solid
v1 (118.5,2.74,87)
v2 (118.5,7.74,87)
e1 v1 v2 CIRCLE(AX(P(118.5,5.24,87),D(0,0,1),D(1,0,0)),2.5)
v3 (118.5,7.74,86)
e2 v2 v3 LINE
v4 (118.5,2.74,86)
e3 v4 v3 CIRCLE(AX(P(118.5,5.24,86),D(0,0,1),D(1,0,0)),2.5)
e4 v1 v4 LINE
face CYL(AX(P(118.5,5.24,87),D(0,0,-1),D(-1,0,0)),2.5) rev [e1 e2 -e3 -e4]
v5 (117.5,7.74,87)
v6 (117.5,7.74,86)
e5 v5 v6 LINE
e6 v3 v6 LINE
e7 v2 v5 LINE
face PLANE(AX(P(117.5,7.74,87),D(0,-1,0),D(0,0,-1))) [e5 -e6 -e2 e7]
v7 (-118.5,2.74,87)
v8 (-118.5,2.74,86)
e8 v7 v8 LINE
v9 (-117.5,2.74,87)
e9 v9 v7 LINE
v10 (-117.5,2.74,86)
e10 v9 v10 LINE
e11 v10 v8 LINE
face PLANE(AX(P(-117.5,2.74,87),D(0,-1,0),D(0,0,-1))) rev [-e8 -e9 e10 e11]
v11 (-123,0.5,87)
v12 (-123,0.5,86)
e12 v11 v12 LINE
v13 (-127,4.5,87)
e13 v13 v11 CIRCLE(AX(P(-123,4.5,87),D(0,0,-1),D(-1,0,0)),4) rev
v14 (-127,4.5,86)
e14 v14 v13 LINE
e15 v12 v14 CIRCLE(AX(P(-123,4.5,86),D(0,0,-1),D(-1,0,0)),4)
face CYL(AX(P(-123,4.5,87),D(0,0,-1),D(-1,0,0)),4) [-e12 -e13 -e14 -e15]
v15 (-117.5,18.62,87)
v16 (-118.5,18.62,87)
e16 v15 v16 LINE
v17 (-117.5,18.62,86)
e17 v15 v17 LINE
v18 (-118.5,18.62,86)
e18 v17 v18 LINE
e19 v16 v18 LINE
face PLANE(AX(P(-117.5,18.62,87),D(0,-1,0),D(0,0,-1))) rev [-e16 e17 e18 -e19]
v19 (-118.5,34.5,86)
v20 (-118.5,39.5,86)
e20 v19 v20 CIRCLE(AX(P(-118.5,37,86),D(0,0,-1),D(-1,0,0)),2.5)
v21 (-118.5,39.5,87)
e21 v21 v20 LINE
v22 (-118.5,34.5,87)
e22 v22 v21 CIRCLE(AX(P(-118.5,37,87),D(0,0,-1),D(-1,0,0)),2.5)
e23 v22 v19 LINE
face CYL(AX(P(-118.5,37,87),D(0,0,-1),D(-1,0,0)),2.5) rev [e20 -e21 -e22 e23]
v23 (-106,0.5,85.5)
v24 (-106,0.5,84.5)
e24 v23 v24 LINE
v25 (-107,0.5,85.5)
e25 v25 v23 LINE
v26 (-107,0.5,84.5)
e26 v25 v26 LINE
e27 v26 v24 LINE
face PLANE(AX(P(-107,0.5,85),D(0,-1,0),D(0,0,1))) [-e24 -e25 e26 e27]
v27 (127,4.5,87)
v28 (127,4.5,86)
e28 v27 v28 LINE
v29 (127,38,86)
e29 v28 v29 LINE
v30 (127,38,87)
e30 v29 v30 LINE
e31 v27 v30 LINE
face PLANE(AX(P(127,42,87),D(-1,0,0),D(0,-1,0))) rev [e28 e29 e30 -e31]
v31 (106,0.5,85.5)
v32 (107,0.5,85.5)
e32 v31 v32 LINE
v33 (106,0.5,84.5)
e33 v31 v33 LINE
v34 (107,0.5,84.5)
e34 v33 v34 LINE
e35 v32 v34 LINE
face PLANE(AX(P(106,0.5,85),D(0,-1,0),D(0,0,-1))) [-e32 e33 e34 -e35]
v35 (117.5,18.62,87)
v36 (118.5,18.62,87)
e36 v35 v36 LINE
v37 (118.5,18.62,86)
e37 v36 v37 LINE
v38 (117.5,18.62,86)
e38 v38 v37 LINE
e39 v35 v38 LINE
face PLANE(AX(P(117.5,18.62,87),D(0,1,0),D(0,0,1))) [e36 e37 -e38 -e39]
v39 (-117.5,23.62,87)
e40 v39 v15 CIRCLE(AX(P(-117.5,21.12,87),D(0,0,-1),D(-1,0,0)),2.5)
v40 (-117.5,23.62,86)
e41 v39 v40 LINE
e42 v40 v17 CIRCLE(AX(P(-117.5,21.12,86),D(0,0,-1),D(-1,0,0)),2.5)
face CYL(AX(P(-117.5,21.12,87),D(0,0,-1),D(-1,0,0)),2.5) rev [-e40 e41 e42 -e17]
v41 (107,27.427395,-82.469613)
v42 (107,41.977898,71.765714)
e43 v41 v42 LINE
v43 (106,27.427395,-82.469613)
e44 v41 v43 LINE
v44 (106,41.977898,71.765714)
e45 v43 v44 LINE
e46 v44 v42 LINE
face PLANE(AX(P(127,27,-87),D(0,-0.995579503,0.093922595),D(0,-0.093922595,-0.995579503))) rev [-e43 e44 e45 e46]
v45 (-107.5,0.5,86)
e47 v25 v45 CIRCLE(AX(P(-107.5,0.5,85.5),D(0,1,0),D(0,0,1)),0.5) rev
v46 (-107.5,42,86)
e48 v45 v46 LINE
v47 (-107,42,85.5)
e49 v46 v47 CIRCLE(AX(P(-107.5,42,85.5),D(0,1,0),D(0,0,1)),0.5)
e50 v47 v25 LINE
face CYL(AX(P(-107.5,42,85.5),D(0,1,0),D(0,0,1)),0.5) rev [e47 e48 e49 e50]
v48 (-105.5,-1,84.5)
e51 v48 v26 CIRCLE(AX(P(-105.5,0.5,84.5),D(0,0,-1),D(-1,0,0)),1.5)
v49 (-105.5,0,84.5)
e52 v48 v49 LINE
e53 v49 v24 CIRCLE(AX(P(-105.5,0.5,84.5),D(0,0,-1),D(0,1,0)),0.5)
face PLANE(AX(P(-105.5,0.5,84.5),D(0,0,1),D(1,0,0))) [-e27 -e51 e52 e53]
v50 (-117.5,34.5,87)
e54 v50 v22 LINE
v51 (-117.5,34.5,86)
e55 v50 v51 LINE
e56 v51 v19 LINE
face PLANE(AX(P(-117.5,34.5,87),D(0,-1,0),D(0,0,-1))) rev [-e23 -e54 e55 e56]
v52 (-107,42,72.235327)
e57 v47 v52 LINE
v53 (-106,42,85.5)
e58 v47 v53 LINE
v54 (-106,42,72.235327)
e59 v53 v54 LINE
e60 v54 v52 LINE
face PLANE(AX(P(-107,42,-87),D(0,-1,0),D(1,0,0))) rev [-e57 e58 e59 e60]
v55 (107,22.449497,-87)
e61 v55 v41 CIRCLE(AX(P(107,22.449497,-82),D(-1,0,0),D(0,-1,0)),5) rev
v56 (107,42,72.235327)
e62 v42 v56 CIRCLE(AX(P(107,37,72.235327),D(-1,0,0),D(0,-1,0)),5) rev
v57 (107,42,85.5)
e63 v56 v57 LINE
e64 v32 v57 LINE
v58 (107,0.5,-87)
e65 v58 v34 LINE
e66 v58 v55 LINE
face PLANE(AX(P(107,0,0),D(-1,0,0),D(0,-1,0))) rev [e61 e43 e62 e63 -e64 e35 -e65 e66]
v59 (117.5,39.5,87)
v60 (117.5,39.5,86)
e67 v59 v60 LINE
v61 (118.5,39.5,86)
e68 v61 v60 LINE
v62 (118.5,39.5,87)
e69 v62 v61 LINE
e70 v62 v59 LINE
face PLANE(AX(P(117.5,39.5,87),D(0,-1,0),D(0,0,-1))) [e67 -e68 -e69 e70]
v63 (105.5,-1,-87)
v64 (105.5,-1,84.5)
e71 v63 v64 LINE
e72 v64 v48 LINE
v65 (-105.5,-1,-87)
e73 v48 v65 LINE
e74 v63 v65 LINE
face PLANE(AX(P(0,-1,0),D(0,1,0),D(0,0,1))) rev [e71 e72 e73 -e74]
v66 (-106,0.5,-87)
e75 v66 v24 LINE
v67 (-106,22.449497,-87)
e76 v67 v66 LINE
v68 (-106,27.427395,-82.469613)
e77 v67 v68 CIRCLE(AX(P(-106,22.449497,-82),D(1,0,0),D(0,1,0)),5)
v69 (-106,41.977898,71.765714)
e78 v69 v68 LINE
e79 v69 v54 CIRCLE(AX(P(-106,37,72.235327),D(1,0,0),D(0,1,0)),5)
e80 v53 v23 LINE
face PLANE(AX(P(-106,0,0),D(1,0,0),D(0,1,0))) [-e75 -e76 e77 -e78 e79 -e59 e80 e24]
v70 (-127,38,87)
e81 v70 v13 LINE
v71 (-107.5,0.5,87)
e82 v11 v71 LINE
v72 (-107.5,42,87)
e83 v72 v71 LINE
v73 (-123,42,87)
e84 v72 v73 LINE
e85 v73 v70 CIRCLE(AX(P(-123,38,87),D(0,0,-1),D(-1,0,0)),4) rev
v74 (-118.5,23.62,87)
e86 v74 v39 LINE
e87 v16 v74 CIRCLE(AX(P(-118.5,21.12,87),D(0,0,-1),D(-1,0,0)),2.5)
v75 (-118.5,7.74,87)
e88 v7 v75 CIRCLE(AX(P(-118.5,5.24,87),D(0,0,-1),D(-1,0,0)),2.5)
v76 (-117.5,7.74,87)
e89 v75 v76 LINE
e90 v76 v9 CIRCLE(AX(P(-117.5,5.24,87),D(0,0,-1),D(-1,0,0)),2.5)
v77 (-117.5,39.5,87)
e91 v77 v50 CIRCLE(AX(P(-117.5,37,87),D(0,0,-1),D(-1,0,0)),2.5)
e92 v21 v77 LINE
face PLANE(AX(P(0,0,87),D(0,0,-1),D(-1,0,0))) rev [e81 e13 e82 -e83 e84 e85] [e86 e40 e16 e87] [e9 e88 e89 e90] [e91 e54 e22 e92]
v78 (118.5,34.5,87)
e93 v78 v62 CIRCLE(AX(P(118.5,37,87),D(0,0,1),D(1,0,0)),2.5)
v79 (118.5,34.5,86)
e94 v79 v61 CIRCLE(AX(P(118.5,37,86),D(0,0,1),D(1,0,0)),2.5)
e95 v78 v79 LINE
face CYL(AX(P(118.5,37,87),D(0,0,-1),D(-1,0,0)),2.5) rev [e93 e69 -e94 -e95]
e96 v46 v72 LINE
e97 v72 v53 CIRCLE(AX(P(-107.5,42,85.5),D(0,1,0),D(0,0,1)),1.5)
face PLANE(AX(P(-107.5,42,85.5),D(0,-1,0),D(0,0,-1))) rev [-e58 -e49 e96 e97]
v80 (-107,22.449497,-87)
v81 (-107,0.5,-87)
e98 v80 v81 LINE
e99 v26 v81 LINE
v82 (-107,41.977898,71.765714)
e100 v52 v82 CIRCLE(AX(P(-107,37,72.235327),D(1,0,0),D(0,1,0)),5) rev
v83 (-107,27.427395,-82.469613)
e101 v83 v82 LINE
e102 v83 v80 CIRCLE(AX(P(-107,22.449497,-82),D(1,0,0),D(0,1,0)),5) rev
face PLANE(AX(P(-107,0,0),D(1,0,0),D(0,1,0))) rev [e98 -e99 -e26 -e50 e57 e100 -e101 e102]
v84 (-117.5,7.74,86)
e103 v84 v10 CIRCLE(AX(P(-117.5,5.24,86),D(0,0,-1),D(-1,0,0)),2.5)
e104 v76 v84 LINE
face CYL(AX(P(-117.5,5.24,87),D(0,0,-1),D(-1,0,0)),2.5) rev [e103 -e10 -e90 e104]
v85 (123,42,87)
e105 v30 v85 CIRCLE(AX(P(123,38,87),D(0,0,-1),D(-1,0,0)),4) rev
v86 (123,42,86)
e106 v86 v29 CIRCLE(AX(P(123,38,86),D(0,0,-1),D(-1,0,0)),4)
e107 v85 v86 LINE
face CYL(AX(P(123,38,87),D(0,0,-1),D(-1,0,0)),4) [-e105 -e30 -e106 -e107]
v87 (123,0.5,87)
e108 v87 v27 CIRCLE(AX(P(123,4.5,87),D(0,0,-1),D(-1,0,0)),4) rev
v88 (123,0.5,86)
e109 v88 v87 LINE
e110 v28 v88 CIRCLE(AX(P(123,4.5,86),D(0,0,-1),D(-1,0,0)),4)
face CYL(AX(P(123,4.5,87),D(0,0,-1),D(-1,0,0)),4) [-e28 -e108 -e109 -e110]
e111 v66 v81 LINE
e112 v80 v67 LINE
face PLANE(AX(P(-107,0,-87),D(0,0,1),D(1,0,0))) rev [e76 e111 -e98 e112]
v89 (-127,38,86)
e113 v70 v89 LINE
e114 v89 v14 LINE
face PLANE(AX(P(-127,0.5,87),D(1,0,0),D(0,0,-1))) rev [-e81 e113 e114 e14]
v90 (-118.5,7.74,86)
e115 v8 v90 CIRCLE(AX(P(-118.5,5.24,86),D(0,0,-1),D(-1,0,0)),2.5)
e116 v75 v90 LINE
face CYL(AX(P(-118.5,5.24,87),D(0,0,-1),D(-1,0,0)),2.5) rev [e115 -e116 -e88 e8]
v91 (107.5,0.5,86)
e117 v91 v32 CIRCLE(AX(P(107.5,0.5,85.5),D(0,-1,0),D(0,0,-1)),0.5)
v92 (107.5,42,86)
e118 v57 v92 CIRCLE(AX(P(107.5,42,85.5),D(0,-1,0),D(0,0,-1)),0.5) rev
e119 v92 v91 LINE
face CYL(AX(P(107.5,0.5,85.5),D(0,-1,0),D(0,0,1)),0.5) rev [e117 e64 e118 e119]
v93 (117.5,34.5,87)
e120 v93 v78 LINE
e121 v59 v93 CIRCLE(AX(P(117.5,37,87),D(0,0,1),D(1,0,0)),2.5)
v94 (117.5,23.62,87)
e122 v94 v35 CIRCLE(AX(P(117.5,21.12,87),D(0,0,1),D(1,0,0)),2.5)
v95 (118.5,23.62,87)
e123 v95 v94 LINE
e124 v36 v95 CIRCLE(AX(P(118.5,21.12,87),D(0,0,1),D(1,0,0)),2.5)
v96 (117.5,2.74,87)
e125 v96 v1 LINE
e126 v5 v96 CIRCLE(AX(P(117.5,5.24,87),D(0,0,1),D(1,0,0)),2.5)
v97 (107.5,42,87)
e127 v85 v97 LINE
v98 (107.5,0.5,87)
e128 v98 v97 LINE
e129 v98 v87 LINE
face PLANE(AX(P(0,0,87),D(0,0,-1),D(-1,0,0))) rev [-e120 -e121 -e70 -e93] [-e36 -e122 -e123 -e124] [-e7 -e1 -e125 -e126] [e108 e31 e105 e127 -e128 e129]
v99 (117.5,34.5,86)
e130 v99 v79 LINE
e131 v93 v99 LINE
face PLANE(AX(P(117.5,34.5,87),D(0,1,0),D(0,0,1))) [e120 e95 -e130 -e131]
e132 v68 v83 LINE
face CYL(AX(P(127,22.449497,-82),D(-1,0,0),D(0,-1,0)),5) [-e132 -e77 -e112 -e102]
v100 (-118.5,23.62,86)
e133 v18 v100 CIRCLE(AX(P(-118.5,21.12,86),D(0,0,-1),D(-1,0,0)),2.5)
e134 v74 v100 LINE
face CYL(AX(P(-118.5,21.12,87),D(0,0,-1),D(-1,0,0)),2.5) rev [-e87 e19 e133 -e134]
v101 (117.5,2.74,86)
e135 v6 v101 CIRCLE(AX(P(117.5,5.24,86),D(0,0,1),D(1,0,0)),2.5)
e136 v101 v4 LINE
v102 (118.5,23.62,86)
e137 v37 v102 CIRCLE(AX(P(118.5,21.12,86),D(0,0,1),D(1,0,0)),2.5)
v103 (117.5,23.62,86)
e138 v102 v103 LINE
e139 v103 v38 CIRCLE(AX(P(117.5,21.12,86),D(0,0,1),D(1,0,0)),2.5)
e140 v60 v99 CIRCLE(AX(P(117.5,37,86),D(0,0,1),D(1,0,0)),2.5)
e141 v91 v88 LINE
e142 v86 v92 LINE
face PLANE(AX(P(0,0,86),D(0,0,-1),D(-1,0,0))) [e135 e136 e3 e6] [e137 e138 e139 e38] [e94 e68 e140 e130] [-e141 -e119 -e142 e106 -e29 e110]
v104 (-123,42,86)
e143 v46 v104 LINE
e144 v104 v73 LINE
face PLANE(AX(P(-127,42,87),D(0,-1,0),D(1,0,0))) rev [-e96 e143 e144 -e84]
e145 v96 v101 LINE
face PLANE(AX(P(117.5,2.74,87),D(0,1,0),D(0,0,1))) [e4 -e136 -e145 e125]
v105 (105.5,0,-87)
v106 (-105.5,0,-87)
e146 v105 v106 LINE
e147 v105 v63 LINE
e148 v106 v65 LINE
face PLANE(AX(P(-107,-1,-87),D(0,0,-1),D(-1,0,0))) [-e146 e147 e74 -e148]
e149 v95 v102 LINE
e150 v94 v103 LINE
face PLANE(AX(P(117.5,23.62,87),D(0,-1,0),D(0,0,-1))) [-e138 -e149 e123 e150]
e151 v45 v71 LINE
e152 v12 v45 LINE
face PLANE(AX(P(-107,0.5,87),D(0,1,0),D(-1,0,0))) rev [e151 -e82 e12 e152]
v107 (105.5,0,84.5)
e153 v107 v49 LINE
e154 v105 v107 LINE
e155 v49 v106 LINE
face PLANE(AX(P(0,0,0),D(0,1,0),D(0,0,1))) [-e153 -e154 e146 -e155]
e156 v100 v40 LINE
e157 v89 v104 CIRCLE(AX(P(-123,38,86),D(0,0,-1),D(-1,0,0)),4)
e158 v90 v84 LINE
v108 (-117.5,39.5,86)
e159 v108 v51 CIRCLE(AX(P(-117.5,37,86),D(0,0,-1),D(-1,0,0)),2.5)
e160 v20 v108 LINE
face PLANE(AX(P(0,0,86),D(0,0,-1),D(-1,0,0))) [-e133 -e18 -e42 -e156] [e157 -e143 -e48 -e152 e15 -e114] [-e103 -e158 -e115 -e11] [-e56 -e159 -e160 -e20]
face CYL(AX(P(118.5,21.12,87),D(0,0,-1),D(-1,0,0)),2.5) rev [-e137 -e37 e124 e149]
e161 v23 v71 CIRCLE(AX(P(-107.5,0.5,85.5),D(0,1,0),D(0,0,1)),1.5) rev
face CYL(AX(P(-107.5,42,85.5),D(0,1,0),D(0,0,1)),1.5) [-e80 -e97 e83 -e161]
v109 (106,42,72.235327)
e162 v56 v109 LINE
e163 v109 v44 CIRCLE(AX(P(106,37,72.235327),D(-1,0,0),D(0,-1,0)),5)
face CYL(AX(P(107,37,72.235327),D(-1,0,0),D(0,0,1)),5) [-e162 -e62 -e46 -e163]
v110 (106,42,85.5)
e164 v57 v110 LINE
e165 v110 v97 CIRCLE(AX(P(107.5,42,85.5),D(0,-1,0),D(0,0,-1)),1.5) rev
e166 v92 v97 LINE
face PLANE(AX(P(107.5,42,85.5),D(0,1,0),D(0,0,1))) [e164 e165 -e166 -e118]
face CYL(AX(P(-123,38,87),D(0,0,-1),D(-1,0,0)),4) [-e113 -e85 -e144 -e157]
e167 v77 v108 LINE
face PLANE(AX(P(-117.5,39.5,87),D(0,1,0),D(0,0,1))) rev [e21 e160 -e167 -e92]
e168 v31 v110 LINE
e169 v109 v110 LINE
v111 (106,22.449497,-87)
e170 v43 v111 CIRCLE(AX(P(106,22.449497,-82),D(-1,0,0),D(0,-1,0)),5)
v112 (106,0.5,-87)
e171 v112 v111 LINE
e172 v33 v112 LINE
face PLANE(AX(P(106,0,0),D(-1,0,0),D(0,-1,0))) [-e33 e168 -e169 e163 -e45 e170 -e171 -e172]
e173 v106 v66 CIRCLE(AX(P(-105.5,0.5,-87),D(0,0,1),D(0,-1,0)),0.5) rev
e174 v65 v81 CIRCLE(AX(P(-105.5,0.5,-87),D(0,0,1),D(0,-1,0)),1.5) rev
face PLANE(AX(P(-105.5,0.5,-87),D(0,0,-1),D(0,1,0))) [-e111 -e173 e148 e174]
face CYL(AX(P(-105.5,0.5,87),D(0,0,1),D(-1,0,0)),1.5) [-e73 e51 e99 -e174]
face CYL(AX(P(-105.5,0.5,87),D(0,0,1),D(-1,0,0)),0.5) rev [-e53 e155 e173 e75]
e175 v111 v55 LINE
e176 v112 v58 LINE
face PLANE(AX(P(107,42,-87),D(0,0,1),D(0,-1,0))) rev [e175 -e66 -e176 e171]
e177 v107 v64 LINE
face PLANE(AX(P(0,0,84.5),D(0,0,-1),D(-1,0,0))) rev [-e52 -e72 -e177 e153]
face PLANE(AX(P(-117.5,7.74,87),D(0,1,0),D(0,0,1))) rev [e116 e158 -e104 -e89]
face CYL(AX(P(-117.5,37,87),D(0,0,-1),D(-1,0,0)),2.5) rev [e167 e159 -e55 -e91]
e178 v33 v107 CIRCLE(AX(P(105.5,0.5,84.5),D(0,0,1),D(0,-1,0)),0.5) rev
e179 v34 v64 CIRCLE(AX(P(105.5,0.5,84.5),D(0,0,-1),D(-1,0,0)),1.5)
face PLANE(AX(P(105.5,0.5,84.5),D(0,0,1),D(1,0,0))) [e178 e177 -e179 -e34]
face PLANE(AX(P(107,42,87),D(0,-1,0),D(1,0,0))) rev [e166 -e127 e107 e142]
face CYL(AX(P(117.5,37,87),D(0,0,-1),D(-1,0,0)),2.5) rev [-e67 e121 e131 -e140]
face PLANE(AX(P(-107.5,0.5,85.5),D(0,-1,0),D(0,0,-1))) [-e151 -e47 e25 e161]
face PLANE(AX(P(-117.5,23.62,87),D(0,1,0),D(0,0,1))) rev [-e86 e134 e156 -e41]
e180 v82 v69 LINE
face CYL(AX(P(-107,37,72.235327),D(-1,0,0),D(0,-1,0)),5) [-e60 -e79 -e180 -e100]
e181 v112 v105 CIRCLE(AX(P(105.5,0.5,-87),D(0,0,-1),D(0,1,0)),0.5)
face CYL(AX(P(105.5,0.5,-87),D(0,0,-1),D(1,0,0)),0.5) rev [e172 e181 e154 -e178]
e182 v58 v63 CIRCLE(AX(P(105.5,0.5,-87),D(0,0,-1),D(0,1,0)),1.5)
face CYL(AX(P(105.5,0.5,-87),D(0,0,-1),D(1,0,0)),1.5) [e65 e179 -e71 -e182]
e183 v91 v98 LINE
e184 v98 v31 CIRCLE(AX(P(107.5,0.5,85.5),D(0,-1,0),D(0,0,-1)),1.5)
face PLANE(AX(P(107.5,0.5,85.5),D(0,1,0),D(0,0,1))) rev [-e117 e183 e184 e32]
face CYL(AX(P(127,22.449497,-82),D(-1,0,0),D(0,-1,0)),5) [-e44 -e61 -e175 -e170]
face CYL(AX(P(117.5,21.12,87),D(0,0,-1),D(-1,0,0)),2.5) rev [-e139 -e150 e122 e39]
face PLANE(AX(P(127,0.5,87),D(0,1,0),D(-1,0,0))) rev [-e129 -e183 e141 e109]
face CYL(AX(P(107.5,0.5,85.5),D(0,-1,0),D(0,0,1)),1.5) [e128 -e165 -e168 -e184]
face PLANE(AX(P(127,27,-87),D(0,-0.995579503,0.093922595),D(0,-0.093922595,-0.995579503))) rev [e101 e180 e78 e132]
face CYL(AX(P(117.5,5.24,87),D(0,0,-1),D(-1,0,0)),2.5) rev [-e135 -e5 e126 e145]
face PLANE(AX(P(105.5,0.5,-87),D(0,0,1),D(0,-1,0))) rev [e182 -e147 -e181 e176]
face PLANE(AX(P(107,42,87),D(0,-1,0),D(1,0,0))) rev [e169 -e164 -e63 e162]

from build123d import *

# Parameters (mm, degrees)
SKETCH1_W                    = 214
SKETCH1_H                    = 174
BASE_FLANGE1_DEPTH           = 1
EDGE_FLANGE3_STRIP_W         = 5
EDGE_FLANGE3_STRIP_H         = 1
EDGE_FLANGE3_STRIP_CUT_DEPTH = 174
EDGE_FLANGE3_DEPTH           = 174
EDGE_FLANGE4_STRIP_W         = 5
EDGE_FLANGE4_STRIP_H         = 1
EDGE_FLANGE4_STRIP_CUT_DEPTH = 174
EDGE_FLANGE4_DEPTH           = 174
EDGE_FLANGE5_STRIP_W         = 5
EDGE_FLANGE5_STRIP_H         = 1
EDGE_FLANGE5_STRIP_CUT_DEPTH = 41.5
EDGE_FLANGE5_DEPTH           = 41.5
EDGE_FLANGE6_STRIP_W         = 5
EDGE_FLANGE6_STRIP_H         = 1
EDGE_FLANGE6_STRIP_CUT_DEPTH = 41.5
EDGE_FLANGE6_DEPTH           = 41.5
FILLET1_R                    = 4
CUT_EXTRUDE1_REACH           = 161.834
SKETCH24_W                   = 214
SKETCH24_H                   = 2.5
SKETCH26_R                   = 2.5
CUT_EXTRUDE2_DEPTH           = 10
CHAMFER1_SIZE                = 1
CUT_EXTRUDE8_DEPTH           = 219.682418132
CUT_EXTRUDE9_DEPTH           = 254.158053397
FILLET2_R                    = 5


# Sheet-metal steps are written as plain solids
with BuildPart() as part:
    # Sketch1 → Base-Flange1 (new body)
    with BuildSketch(Plane(origin=(0, 0, 0), x_dir=(1, 0, 0), z_dir=(0, 1, 0))):
        Rectangle(SKETCH1_W, SKETCH1_H)
    extrude(amount=-BASE_FLANGE1_DEPTH)

    # Edge-Flange3 strip (across the edge) → Edge-Flange3 strip cut (cut)
    with BuildSketch(Plane(origin=(-107, 0, -87), x_dir=(1, 0, 0), z_dir=(0, 0, 1))):
        with Locations((-1, -0.5)):
            Rectangle(EDGE_FLANGE3_STRIP_W, EDGE_FLANGE3_STRIP_H)
    extrude(amount=EDGE_FLANGE3_STRIP_CUT_DEPTH, mode=Mode.SUBTRACT)

    # Edge-Flange3 section (across the edge) → Edge-Flange3 (add)
    with BuildSketch(Plane(origin=(-107, 0, -87), x_dir=(1, 0, 0), z_dir=(0, 0, 1))):
        with BuildLine():
            Line((0, 0.5), (0, 42))
            Line((0, 42), (1, 42))
            Line((1, 42), (1, 0.5))
            ThreePointArc((1, 0.5), (1.146446609, 0.146446609), (1.5, 0))
            Line((1.5, 0), (1.5, -1))
            ThreePointArc((1.5, -1), (0.439339828, -0.560660172), (0, 0.5))
        make_face()
    extrude(amount=EDGE_FLANGE3_DEPTH)

    # Edge-Flange4 strip (across the edge) → Edge-Flange4 strip cut (cut)
    with BuildSketch(Plane(origin=(107, 0, 87), x_dir=(-1, 0, 0), z_dir=(0, 0, -1))):
        with Locations((-1, -0.5)):
            Rectangle(EDGE_FLANGE4_STRIP_W, EDGE_FLANGE4_STRIP_H)
    extrude(amount=EDGE_FLANGE4_STRIP_CUT_DEPTH, mode=Mode.SUBTRACT)

    # Edge-Flange4 section (across the edge) → Edge-Flange4 (add)
    with BuildSketch(Plane(origin=(107, 0, 87), x_dir=(-1, 0, 0), z_dir=(0, 0, -1))):
        with BuildLine():
            Line((0, 0.5), (0, 42))
            Line((0, 42), (1, 42))
            Line((1, 42), (1, 0.5))
            ThreePointArc((1, 0.5), (1.146446609, 0.146446609), (1.5, 0))
            Line((1.5, 0), (1.5, -1))
            ThreePointArc((1.5, -1), (0.439339828, -0.560660172), (0, 0.5))
        make_face()
    extrude(amount=EDGE_FLANGE4_DEPTH)

    # Edge-Flange5 strip (across the edge) → Edge-Flange5 strip cut (cut)
    with BuildSketch(Plane(origin=(107, 42, 87), x_dir=(0, 0, -1), z_dir=(0, -1, 0))):
        with Locations((-1, -0.5)):
            Rectangle(EDGE_FLANGE5_STRIP_W, EDGE_FLANGE5_STRIP_H)
    extrude(amount=EDGE_FLANGE5_STRIP_CUT_DEPTH, mode=Mode.SUBTRACT)

    # Edge-Flange5 section (across the edge) → Edge-Flange5 (add)
    with BuildSketch(Plane(origin=(107, 42, 87), x_dir=(0, 0, -1), z_dir=(0, -1, 0))):
        with BuildLine():
            Line((0, 0.5), (0, 20))
            Line((0, 20), (1, 20))
            Line((1, 20), (1, 0.5))
            ThreePointArc((1, 0.5), (1.146446609, 0.146446609), (1.5, 0))
            Line((1.5, 0), (1.5, -1))
            ThreePointArc((1.5, -1), (0.439339828, -0.560660172), (0, 0.5))
        make_face()
    extrude(amount=EDGE_FLANGE5_DEPTH)

    # Edge-Flange6 strip (across the edge) → Edge-Flange6 strip cut (cut)
    with BuildSketch(Plane(origin=(-107, 0.5, 87), x_dir=(0, 0, -1), z_dir=(0, 1, 0))):
        with Locations((-1, -0.5)):
            Rectangle(EDGE_FLANGE6_STRIP_W, EDGE_FLANGE6_STRIP_H)
    extrude(amount=EDGE_FLANGE6_STRIP_CUT_DEPTH, mode=Mode.SUBTRACT)

    # Edge-Flange6 section (across the edge) → Edge-Flange6 (add)
    with BuildSketch(Plane(origin=(-107, 0.5, 87), x_dir=(0, 0, -1), z_dir=(0, 1, 0))):
        with BuildLine():
            Line((0, 0.5), (0, 20))
            Line((0, 20), (1, 20))
            Line((1, 20), (1, 0.5))
            ThreePointArc((1, 0.5), (1.146446609, 0.146446609), (1.5, 0))
            Line((1.5, 0), (1.5, -1))
            ThreePointArc((1.5, -1), (0.439339828, -0.560660172), (0, 0.5))
        make_face()
    extrude(amount=EDGE_FLANGE6_DEPTH)

    # Fillet1
    fillet1_edges = [part.edges().sort_by_distance(p)[0] for p in [
        (127, 42, 86.5),
        (127, 0.5, 86.5),
        (-127, 0.5, 86.5),
        (-127, 42, 86.5),
    ]]
    fillet(fillet1_edges, radius=FILLET1_R)

    # Cut-Extrude1: up to this face of the body (flat: up to its plane)
    cut_extrude1_end = Plane(part.part.faces().sort_by_distance((114.980552593, 0.5, 86.497536063))[0])
    # Sketch24 → Cut-Extrude1 (cut, up to the picked face)
    with BuildSketch(Plane.XZ.offset(1), mode=Mode.PRIVATE) as cut_extrude1_sk1:
        with Locations((0, 85.75)):
            Rectangle(SKETCH24_W, SKETCH24_H)
    cut_extrude1_tool1 = split(extrude(cut_extrude1_sk1.sketch, amount=-CUT_EXTRUDE1_REACH, mode=Mode.PRIVATE), bisect_by=cut_extrude1_end, keep=Keep.BOTH, mode=Mode.PRIVATE)
    add(cut_extrude1_tool1.solids().sort_by(Axis((0, -1, 85.75), (0, 1, 0)))[0], mode=Mode.SUBTRACT)

    # Sketch26 → Cut-Extrude2 (cut)
    with BuildSketch(Plane.XY.offset(87)):
        with Locations((-118, 37)):
            Circle(SKETCH26_R)
        with Locations((-118, 5.24)):
            Circle(SKETCH26_R)
        with Locations((-118, 21.12)):
            Circle(SKETCH26_R)
        with Locations(Location((118, 5.24, 0), (0, 0, 180))):
            Circle(SKETCH26_R)
        with Locations(Location((118, 21.12, 0), (0, 0, 180))):
            Circle(SKETCH26_R)
        with Locations(Location((118, 37, 0), (0, 0, 180))):
            Circle(SKETCH26_R)
    extrude(amount=-CUT_EXTRUDE2_DEPTH, mode=Mode.SUBTRACT)

    # Chamfer1
    chamfer1_edges = [part.edges().sort_by_distance(p)[0] for p in [
        (-106.5, 42, -87),
        (106.5, 42, -87),
    ]]
    chamfer(chamfer1_edges, length=CHAMFER1_SIZE)

    # Sketch32 → Cut-Extrude8 (cut, through all)
    with BuildSketch(Plane(origin=(0, 0, 86), x_dir=(-1, 0, 0), z_dir=(0, 0, -1))):
        with BuildLine():
            Line((117.5, 39.5), (118.5, 39.5))
            ThreePointArc((118.5, 39.5), (121, 37), (118.5, 34.5))
            Line((118.5, 34.5), (117.5, 34.5))
            ThreePointArc((117.5, 34.5), (115, 37), (117.5, 39.5))
        make_face()
        with BuildLine():
            Line((117.5, 23.62), (118.5, 23.62))
            ThreePointArc((118.5, 23.62), (121, 21.12), (118.5, 18.62))
            Line((118.5, 18.62), (117.5, 18.62))
            ThreePointArc((117.5, 18.62), (115, 21.12), (117.5, 23.62))
        make_face()
        with BuildLine():
            Line((117.5, 7.74), (118.5, 7.74))
            ThreePointArc((118.5, 7.74), (121, 5.24), (118.5, 2.74))
            Line((118.5, 2.74), (117.5, 2.74))
            ThreePointArc((117.5, 2.74), (115, 5.24), (117.5, 7.74))
        make_face()
    cut_extrude8 = extrude(amount=-CUT_EXTRUDE8_DEPTH, mode=Mode.SUBTRACT)

    # Mirror1: Cut-Extrude8 across plane
    add(cut_extrude8.mirror(Plane(origin=(0, 0, 0), x_dir=(0, 0, 1), z_dir=(1, 0, 0))), mode=Mode.SUBTRACT)

    # Sketch41 → Cut-Extrude9 (cut, through all)
    with BuildSketch(Plane.ZY.offset(107)):
        Polygon((-87, 27), (72, 42), (-87, 42), align=None)
    extrude(amount=-CUT_EXTRUDE9_DEPTH, mode=Mode.SUBTRACT)

    # Fillet2
    # the kernel refuses this fillet: 5 mm, written as the material it takes off along each edge
    with BuildSketch(Plane(origin=(105.411683458, 42, 72), x_dir=(0, -0.09392259459562911, -0.9955795027140852), z_dir=(1, 0, 0))) as fillet2_piece_1:
        with BuildLine():
            CenterArc((FILLET2_R * 0.0470653233649, -FILLET2_R), FILLET2_R, 90, 5.38931176)
            Line((-FILLET2_R * 0.0468572712307, -FILLET2_R * 0.00442049728592), (0, 0))
            Line((0, 0), (FILLET2_R * 0.0470653233649, 0))
        make_face()
    extrude(amount=2.176633084, mode=Mode.SUBTRACT)
    with BuildSketch(Plane(origin=(-107.588316542, 42, 72), x_dir=(0, 0, 1), z_dir=(1, 0, 0))) as fillet2_piece_2:
        with BuildLine():
            CenterArc((FILLET2_R * 0.0470653233649, FILLET2_R), FILLET2_R, 264.61068824, 5.38931176)
            Line((-FILLET2_R * 0.0468572712307, FILLET2_R * 0.00442049728592), (0, 0))
            Line((0, 0), (FILLET2_R * 0.0470653233649, 0))
        make_face()
    extrude(amount=2.176633084, mode=Mode.SUBTRACT)
    with BuildSketch(Plane(origin=(94.623743722, 27, -87), x_dir=(0, -1, 0), z_dir=(1, 0, 0))) as fillet2_piece_3:
        with BuildLine():
            CenterArc((FILLET2_R * 0.910100502204, -FILLET2_R), FILLET2_R, 90, 84.61068824)
            Line((-FILLET2_R * 0.0854790005098, -FILLET2_R * 0.906077405404), (0, 0))
            Line((0, 0), (FILLET2_R * 0.910100502204, 0))
        make_face()
    extrude(amount=23.752512555, mode=Mode.SUBTRACT)
    with BuildSketch(Plane(origin=(-118.376256278, 27, -87), x_dir=(0, 0.0939225945956684, 0.9955795027140816), z_dir=(1, 0, 0))) as fillet2_piece_4:
        with BuildLine():
            CenterArc((FILLET2_R * 0.910100502204, FILLET2_R), FILLET2_R, 185.38931176, 84.61068824)
            Line((-FILLET2_R * 0.0854790005098, FILLET2_R * 0.906077405404), (0, 0))
            Line((0, 0), (FILLET2_R * 0.910100502204, 0))
        make_face()
    extrude(amount=23.752512555, mode=Mode.SUBTRACT)


solid = part.part
